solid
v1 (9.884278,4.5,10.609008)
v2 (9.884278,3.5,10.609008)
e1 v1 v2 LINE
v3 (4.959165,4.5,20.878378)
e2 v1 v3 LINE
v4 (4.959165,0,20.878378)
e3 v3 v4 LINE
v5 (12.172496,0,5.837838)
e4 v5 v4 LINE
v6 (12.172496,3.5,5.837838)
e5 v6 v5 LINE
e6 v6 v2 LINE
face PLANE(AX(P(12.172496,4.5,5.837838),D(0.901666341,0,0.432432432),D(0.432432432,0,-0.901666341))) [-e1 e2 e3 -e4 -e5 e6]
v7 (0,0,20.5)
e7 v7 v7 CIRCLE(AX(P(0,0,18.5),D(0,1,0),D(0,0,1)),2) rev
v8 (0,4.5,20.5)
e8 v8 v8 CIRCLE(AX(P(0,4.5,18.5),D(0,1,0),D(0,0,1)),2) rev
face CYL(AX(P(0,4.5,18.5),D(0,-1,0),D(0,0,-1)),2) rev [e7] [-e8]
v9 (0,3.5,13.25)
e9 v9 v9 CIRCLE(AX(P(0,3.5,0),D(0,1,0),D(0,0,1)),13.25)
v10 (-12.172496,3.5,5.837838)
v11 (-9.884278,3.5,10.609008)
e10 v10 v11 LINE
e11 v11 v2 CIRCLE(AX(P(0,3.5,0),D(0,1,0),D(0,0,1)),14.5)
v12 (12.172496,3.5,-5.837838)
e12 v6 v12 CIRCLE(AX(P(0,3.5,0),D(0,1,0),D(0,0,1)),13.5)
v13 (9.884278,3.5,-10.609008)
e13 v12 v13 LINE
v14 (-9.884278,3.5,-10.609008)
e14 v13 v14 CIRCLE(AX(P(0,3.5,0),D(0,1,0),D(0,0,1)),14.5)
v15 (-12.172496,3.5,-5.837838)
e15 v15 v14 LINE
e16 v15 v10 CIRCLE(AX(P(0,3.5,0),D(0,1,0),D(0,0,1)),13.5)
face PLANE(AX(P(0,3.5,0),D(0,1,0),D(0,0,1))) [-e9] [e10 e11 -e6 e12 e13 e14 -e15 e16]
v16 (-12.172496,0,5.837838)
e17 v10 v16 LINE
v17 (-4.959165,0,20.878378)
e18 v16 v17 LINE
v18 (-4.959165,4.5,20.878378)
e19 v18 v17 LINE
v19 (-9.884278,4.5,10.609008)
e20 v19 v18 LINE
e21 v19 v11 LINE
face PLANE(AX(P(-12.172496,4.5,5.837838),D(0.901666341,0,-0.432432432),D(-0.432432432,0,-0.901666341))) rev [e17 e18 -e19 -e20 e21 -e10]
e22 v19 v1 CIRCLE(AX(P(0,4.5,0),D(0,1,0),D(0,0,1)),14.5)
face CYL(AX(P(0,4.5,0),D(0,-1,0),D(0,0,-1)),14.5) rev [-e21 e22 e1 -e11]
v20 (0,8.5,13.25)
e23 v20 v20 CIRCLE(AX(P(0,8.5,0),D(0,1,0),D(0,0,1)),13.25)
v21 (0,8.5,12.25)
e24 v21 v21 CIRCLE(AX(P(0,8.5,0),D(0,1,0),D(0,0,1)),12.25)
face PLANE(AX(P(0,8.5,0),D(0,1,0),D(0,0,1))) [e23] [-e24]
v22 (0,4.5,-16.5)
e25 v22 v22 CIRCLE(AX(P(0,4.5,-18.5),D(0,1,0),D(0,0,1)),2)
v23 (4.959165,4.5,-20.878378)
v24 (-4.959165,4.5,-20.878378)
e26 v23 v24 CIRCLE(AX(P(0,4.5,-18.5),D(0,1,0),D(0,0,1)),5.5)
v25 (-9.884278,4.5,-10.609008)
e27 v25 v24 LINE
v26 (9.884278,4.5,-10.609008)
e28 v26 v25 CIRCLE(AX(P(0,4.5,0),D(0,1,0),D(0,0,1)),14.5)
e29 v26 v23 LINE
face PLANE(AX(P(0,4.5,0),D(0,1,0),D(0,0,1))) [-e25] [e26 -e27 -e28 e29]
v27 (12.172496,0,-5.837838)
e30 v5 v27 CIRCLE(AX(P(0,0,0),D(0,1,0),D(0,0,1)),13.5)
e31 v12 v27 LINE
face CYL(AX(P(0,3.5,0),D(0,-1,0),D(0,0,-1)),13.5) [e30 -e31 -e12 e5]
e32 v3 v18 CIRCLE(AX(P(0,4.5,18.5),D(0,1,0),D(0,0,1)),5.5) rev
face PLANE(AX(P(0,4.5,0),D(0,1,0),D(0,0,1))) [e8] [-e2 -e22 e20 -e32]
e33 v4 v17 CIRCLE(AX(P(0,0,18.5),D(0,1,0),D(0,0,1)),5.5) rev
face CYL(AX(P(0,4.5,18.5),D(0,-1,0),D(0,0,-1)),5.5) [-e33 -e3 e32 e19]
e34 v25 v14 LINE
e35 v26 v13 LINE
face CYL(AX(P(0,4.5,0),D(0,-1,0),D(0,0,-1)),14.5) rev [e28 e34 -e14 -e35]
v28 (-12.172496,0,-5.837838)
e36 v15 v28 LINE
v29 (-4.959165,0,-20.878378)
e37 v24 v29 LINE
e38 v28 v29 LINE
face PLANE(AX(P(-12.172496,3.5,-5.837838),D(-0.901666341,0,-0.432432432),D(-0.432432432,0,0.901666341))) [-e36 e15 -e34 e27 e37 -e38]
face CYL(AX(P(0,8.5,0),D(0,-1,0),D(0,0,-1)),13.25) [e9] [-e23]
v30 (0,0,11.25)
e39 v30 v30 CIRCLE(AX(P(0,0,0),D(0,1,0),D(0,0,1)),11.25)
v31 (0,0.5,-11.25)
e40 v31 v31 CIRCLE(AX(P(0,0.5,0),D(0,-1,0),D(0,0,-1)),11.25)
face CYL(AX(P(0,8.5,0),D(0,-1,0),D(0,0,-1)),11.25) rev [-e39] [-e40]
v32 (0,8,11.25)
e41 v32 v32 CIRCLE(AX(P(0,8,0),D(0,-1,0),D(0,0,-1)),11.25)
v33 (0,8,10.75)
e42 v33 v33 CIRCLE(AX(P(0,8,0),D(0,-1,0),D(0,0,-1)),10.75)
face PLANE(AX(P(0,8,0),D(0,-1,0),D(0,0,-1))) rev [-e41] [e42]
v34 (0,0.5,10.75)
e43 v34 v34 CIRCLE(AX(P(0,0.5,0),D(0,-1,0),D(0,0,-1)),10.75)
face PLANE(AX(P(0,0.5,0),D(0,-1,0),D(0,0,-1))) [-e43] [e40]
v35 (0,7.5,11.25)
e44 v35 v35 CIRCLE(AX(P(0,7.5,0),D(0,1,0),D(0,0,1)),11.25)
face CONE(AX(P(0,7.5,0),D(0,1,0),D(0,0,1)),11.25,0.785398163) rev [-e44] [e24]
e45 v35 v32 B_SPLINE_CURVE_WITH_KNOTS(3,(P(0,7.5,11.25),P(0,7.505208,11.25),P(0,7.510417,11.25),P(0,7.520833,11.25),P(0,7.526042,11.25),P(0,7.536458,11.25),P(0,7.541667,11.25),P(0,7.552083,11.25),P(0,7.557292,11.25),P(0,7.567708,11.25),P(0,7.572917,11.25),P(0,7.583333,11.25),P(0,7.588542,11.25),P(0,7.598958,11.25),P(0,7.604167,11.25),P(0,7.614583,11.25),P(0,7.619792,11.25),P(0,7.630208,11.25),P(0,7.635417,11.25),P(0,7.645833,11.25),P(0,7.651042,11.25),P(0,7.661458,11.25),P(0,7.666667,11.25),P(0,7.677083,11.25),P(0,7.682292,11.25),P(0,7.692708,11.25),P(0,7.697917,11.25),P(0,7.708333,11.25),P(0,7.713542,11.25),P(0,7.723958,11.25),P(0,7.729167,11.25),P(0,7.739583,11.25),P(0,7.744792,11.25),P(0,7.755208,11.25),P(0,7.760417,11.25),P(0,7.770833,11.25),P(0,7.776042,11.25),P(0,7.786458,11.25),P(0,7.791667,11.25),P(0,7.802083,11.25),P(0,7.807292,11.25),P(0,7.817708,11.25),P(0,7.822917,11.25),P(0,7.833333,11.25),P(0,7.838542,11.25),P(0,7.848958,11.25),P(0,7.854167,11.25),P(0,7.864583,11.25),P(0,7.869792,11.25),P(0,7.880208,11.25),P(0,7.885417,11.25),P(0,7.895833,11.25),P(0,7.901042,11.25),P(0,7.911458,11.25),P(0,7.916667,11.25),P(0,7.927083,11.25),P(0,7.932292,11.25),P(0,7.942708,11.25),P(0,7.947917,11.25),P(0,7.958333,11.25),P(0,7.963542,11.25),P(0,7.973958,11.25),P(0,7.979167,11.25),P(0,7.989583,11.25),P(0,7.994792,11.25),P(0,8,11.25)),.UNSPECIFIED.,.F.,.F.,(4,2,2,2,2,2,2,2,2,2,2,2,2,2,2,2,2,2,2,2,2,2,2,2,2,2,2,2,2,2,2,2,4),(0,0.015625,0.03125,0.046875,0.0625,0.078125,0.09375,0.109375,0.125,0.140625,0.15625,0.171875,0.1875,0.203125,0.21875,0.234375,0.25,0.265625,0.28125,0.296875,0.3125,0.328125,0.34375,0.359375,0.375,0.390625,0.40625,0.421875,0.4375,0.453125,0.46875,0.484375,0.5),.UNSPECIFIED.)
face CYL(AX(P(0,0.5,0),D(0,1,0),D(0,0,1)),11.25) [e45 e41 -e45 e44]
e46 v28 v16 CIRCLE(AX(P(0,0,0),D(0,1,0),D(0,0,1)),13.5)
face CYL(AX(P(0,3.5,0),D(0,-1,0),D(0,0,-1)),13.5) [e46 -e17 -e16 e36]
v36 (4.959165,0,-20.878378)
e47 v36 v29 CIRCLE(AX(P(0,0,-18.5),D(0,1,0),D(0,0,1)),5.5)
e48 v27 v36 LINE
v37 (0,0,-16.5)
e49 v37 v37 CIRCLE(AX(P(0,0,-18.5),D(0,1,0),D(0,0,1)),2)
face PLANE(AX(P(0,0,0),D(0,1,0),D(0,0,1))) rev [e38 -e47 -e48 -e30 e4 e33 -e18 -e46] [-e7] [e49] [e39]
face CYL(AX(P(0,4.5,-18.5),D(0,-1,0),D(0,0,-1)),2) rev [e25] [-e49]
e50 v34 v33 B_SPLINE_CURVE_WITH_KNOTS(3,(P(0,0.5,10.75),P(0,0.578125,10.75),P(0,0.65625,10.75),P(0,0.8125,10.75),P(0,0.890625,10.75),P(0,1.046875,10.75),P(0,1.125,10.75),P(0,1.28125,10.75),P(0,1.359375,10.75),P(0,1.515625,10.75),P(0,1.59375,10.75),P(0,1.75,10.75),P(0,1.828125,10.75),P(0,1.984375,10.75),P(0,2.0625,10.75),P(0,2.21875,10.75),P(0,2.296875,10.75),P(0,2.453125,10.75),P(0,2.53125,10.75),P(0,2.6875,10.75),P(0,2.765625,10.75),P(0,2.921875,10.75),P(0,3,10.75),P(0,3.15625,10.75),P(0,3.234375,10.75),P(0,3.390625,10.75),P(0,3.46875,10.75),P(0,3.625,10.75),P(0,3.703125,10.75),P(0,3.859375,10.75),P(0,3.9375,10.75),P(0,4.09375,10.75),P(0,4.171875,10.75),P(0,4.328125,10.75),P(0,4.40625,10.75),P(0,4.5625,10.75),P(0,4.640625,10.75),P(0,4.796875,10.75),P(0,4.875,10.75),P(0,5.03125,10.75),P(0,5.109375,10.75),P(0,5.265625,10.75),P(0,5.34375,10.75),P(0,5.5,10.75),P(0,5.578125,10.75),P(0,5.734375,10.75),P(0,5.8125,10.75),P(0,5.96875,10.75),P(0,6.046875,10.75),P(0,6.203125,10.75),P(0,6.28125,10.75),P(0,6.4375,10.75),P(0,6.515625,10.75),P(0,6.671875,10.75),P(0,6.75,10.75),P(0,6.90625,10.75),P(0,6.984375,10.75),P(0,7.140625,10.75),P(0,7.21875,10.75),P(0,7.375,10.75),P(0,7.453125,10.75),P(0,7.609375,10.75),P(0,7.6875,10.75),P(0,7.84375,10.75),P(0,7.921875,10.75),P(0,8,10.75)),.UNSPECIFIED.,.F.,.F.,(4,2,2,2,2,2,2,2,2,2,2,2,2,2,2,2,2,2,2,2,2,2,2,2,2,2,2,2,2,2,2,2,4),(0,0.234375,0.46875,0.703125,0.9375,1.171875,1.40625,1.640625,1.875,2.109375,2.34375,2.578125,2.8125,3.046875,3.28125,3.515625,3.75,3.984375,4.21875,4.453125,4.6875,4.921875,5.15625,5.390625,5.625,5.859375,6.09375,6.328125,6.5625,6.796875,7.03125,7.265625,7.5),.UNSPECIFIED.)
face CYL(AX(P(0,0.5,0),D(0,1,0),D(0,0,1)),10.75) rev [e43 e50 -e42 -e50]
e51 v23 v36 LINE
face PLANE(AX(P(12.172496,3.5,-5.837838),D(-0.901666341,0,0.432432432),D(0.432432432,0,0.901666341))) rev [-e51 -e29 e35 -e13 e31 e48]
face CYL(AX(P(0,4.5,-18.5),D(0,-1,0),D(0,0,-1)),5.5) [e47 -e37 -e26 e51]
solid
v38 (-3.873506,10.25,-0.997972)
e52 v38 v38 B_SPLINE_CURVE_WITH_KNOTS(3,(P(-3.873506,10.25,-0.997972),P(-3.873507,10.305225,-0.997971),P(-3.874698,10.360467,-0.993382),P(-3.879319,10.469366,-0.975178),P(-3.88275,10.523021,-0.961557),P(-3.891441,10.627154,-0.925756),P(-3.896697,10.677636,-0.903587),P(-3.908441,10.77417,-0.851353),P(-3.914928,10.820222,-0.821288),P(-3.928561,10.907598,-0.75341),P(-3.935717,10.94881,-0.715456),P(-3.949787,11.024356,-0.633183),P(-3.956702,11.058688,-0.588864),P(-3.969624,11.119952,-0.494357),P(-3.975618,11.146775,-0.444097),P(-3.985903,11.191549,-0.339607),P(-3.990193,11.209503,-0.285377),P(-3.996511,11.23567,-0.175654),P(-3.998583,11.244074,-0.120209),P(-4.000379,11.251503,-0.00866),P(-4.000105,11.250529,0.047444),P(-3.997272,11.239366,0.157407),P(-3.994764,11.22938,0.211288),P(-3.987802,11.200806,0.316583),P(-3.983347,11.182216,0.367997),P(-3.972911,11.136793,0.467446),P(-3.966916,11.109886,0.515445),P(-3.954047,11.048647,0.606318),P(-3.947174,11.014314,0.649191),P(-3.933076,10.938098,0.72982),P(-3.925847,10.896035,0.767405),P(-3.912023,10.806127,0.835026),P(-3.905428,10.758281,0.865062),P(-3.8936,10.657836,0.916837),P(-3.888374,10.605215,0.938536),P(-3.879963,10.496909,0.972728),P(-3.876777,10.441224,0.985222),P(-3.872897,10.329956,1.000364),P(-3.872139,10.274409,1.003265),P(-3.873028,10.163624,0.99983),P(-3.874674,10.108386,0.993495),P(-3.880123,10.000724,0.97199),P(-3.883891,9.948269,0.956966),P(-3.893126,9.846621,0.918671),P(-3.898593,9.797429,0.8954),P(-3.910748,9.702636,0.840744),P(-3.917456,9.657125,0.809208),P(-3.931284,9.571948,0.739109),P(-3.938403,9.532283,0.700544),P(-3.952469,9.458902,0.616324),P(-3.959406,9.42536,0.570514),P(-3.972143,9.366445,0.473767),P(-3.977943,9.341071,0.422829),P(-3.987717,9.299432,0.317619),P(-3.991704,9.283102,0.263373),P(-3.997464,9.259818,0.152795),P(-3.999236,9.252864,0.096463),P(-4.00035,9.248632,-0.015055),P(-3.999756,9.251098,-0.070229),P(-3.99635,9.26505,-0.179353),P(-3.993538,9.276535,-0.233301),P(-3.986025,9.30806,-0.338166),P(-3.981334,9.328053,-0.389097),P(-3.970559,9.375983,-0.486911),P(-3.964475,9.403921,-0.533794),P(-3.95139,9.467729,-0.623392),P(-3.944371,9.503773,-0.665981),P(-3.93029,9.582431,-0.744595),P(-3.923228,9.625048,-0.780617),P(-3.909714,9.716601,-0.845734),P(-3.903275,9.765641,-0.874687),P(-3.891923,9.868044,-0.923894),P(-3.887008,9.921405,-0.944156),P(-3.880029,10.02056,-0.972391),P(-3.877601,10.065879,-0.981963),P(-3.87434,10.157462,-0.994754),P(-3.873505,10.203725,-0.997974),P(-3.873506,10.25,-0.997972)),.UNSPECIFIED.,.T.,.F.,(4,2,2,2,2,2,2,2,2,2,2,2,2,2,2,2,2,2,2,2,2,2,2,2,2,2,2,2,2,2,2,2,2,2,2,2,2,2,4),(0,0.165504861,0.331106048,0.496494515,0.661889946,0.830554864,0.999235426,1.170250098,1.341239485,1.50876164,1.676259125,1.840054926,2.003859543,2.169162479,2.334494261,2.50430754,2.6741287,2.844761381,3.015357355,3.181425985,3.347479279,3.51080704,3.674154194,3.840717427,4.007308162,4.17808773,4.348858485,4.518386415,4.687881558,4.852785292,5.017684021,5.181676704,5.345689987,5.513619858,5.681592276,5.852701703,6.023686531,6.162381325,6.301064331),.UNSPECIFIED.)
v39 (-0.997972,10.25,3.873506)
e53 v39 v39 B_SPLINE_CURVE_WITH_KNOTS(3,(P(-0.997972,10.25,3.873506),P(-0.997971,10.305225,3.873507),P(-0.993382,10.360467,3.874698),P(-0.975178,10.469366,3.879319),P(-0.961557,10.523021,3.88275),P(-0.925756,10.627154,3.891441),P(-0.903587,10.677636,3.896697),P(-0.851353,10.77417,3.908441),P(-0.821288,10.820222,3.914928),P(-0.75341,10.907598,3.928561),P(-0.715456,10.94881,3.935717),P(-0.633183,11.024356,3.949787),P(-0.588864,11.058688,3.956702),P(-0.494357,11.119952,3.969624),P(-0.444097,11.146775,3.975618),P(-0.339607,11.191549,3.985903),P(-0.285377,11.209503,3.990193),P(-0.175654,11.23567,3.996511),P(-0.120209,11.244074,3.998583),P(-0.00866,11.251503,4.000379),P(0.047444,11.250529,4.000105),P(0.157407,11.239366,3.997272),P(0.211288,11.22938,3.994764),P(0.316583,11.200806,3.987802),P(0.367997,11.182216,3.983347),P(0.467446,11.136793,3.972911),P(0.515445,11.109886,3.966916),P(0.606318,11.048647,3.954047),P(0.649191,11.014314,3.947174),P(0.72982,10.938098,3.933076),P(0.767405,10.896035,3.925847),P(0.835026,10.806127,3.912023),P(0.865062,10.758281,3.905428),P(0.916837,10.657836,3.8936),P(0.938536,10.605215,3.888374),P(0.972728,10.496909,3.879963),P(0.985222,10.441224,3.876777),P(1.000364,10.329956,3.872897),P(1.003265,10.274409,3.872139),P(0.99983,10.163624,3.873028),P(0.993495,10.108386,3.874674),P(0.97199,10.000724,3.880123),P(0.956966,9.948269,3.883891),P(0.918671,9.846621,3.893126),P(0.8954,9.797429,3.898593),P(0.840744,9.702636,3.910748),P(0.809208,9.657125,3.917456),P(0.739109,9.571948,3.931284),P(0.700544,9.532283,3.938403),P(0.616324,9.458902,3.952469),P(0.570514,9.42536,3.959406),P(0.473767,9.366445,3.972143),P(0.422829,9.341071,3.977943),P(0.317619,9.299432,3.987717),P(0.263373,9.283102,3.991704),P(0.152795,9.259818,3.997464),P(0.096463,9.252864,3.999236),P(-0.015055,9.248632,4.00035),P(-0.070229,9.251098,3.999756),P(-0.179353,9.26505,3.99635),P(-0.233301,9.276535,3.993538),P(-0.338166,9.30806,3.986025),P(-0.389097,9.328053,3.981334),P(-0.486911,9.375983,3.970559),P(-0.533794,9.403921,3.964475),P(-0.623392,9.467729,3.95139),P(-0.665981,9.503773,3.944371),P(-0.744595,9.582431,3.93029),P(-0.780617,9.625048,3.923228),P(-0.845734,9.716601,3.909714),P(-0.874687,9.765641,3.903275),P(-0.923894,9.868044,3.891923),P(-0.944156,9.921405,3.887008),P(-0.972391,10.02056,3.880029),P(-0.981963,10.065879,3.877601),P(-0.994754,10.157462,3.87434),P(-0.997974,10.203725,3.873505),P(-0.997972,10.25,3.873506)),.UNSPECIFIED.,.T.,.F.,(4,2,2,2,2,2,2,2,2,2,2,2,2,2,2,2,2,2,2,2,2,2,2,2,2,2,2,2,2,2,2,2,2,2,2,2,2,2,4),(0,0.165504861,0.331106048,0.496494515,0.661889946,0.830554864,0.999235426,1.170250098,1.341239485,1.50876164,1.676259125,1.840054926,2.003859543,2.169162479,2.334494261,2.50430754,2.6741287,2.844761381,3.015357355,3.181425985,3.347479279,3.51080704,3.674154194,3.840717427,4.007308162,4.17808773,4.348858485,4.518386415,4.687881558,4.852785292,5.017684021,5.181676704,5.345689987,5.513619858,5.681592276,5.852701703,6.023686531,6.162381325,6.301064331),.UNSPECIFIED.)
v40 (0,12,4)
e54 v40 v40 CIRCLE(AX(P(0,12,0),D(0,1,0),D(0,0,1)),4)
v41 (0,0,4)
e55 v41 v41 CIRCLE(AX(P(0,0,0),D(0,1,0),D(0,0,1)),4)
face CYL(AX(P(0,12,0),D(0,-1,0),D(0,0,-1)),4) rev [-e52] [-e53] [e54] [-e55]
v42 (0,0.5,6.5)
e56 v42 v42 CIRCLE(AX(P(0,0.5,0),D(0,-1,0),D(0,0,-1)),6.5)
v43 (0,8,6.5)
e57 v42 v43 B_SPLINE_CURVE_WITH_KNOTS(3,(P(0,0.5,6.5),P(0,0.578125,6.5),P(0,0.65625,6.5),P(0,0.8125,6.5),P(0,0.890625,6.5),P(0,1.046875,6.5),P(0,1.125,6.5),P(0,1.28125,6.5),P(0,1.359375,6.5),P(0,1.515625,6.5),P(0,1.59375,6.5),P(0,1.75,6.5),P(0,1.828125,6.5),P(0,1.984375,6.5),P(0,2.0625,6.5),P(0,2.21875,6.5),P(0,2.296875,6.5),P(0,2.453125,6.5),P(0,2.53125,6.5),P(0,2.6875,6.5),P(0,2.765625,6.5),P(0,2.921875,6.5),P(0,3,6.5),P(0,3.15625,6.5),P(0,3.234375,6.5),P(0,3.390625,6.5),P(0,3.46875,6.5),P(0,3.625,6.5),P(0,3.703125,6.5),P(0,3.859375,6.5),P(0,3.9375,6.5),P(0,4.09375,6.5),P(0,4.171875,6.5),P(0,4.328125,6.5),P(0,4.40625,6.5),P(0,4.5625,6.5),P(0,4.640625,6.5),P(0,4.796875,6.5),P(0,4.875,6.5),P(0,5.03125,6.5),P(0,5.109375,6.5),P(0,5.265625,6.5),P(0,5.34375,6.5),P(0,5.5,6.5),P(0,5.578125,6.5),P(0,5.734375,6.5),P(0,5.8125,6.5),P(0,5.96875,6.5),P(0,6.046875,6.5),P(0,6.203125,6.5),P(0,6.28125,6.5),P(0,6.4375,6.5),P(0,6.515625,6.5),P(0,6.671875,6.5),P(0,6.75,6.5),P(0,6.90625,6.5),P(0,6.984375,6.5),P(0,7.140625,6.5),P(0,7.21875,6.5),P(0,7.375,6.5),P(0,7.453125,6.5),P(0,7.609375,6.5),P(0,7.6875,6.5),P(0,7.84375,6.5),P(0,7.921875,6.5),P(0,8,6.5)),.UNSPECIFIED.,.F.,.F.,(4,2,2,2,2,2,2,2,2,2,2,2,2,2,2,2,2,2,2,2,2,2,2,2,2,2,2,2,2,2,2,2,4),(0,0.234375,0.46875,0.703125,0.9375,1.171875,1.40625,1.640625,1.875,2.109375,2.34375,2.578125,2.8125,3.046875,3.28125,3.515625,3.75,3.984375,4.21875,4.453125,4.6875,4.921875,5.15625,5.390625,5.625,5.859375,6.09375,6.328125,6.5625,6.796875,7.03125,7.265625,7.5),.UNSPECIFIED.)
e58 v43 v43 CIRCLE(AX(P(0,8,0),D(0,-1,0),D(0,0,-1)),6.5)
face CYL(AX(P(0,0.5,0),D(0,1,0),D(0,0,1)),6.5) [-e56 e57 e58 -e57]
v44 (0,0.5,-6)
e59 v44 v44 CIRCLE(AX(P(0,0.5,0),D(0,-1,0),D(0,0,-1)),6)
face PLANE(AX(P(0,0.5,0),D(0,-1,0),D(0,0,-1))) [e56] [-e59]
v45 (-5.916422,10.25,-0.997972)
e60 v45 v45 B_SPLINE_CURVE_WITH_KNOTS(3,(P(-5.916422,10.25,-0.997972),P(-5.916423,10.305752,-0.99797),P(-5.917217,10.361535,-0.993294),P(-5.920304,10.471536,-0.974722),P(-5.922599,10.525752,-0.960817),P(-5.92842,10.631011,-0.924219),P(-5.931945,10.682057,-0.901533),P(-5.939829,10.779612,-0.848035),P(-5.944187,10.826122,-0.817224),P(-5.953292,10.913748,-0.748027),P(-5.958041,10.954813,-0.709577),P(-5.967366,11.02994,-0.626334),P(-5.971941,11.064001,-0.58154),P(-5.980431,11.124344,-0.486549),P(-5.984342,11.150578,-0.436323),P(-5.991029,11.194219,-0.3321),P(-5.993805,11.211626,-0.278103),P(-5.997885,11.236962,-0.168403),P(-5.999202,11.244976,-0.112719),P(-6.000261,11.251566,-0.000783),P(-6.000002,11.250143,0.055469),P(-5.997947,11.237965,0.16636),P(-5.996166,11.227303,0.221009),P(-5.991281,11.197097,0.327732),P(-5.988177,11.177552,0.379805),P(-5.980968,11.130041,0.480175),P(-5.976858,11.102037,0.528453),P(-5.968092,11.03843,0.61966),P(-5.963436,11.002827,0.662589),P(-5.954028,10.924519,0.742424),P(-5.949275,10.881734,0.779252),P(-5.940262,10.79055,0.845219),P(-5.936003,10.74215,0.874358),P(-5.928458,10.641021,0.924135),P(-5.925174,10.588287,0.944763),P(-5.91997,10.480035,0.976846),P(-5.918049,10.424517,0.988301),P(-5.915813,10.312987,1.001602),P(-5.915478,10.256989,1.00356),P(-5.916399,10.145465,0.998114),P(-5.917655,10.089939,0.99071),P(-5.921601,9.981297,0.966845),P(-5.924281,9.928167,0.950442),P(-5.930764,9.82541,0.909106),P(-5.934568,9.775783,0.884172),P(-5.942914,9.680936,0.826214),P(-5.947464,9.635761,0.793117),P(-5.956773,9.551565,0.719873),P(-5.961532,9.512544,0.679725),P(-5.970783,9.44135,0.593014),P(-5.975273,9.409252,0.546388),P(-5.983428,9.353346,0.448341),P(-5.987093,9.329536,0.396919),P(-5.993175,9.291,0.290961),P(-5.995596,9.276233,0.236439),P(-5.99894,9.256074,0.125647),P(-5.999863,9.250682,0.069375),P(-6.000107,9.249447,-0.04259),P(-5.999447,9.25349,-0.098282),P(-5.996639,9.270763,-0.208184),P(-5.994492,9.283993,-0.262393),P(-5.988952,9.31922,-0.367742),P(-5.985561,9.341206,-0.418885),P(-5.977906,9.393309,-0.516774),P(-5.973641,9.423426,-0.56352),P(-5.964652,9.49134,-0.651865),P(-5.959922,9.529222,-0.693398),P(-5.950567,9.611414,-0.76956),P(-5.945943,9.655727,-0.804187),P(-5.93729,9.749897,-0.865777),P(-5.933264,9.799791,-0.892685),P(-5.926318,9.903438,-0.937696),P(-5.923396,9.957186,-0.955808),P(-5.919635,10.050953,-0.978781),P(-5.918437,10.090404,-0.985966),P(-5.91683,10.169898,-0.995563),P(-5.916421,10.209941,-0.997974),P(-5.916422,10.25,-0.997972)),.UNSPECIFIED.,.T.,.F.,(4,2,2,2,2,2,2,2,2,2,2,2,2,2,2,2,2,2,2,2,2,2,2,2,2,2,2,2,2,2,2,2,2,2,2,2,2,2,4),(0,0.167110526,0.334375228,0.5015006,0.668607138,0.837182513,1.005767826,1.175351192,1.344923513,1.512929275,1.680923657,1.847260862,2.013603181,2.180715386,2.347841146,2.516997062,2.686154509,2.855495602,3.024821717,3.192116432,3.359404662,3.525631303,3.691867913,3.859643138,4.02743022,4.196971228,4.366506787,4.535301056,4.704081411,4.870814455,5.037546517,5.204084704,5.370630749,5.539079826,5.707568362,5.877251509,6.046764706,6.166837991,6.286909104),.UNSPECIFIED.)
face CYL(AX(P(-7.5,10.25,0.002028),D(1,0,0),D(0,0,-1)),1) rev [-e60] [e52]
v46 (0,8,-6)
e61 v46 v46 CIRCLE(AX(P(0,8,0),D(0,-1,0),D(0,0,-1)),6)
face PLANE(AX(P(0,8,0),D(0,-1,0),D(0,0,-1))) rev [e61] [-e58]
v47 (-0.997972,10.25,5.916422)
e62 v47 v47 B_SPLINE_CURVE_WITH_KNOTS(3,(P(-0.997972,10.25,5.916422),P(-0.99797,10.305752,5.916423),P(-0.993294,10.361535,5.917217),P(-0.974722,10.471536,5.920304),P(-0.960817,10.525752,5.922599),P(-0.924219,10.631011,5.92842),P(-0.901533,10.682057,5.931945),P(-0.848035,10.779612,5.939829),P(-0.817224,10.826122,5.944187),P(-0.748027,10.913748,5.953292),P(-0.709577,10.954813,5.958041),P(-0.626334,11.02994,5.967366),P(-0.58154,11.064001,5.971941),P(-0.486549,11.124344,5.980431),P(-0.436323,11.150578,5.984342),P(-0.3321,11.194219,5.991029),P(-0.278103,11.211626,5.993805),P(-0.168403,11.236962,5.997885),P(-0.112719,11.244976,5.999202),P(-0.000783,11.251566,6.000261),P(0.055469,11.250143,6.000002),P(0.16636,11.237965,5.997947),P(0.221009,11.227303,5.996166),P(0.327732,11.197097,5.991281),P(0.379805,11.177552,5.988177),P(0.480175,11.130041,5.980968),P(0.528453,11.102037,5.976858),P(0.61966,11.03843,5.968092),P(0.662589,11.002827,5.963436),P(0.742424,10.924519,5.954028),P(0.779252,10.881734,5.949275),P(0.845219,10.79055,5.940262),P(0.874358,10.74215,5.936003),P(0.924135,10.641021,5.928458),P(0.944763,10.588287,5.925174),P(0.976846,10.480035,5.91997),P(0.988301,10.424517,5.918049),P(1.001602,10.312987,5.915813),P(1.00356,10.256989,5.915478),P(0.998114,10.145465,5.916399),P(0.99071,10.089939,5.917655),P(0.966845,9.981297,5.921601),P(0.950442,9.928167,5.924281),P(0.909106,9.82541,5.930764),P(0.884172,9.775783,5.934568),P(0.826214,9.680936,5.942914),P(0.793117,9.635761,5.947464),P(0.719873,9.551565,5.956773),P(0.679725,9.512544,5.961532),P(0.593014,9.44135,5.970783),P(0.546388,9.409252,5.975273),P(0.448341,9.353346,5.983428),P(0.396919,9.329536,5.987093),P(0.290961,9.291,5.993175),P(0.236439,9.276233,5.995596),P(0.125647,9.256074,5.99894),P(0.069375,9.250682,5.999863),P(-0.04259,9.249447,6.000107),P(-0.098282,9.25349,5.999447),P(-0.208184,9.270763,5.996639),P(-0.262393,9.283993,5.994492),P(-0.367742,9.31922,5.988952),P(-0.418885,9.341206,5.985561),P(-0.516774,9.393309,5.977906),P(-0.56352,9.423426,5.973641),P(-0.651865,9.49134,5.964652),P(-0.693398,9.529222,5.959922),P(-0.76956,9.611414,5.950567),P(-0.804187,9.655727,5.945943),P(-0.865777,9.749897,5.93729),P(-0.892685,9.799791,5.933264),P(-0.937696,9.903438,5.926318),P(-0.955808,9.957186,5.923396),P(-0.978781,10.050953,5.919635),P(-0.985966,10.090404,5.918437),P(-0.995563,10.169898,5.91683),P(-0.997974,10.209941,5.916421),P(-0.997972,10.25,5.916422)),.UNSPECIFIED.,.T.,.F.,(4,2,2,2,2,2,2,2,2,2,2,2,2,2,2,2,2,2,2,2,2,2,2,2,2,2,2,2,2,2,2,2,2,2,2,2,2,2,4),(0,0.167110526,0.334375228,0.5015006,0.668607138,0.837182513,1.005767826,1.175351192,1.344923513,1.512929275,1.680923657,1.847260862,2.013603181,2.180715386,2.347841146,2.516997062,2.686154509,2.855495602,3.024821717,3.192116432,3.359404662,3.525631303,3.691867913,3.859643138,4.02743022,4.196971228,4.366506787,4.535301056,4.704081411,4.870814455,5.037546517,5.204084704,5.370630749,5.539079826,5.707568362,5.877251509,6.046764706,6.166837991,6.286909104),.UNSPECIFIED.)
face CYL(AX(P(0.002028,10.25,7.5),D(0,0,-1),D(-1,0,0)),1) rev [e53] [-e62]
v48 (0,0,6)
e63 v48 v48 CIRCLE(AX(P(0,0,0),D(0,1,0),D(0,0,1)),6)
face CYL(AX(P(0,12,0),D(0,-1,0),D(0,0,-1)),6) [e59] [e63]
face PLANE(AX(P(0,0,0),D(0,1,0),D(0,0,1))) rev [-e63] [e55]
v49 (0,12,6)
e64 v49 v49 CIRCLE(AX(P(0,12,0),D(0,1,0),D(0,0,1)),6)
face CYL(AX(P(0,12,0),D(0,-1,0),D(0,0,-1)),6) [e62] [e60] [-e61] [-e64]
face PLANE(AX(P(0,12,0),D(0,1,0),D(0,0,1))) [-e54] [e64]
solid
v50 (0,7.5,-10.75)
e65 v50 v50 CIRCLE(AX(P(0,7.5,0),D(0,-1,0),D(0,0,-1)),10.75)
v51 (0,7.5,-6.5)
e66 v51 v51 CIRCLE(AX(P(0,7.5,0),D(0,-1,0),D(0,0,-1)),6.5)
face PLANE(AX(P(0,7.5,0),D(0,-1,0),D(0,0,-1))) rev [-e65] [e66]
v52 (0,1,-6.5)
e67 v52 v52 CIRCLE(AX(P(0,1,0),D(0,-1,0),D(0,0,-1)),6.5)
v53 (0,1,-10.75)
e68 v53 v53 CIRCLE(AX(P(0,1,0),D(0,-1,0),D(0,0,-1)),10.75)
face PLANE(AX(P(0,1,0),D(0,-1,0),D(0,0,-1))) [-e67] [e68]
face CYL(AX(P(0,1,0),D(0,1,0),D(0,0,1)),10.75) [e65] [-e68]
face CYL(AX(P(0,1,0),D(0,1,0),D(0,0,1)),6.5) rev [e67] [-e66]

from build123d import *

# Parameters (mm, degrees)
SKETCH1_R             = 2
BOSS_EXTRUDE1_DEPTH   = 4.5
BOSS_EXTRUDE1_2_DEPTH = 4.5
SKETCH1_3_R           = 13.5
SKETCH1_3_R_2         = 13.25
BOSS_EXTRUDE2_DEPTH   = 3.5
SKETCH1_5_R           = 13.25
SKETCH1_5_R_2         = 12.25
BOSS_EXTRUDE3_DEPTH   = 8.5
SKETCH1_6_R           = 6
SKETCH1_6_R_2         = 4
BOSS_EXTRUDE4_DEPTH   = 12
SKETCH1_7_R           = 12.25
SKETCH1_7_R_2         = 11.25
BOSS_EXTRUDE5_DEPTH   = 8.5
CHAMFER1_SIZE         = 1
SKETCH2_R             = 11.25
SKETCH2_R_2           = 10.75
SKETCH2_R_3           = 6.5
SKETCH2_R_4           = 6
BOSS_EXTRUDE6_DEPTH   = 3.75
SKETCH2_3_R           = 10.75
SKETCH2_3_R_2         = 6.5
BOSS_EXTRUDE7_DEPTH   = 3.25
SKETCH3_R             = 1
CUT_EXTRUDE2_DEPTH    = 7.5
CIRPATTERN1_COUNT     = 2
CIRPATTERN1_ANGLE     = 90


with BuildPart() as part:
    # Sketch1 → Boss-Extrude1 (new body)
    with BuildSketch(Plane(origin=(0, 0, 0), x_dir=(1, 0, 0), z_dir=(0, 1, 0))):
        with BuildLine():
            Line((4.959164878, -20.878378378), (9.88427826, -10.609007648))
            ThreePointArc((9.88427826, -10.609007648), (0, -14.5), (-9.88427826, -10.609007648))
            Line((-9.88427826, -10.609007648), (-4.959164878, -20.878378378))
            ThreePointArc((-4.959164878, -20.878378378), (0, -24), (4.959164878, -20.878378378))
        make_face()
        with Locations(Location((0, -18.5, 0), (0, 0, 270))):
            Circle(SKETCH1_R, mode=Mode.SUBTRACT)
    extrude(amount=BOSS_EXTRUDE1_DEPTH)



with BuildPart() as body_2:
    # Sketch1 → Boss-Extrude1 2 (new body)
    with BuildSketch(Plane(origin=(0, 0, 0), x_dir=(1, 0, 0), z_dir=(0, 1, 0))):
        with BuildLine():
            ThreePointArc((-9.88427826, 10.609007648), (0, 14.5), (9.88427826, 10.609007648))
            Line((9.88427826, 10.609007648), (4.959164878, 20.878378378))
            ThreePointArc((4.959164878, 20.878378378), (0, 24), (-4.959164878, 20.878378378))
            Line((-4.959164878, 20.878378378), (-9.88427826, 10.609007648))
        make_face()
        with Locations(Location((0, 18.5, 0), (0, 0, 270))):
            Circle(SKETCH1_R, mode=Mode.SUBTRACT)
    extrude(amount=BOSS_EXTRUDE1_2_DEPTH)


with BuildPart() as part_1:
    add(part.part)

    add(body_2.part)  # Boss-Extrude2 merges body 2
    # Sketch1<3> → Boss-Extrude2 (add)
    # profile 1 of 3: a face of its own
    with BuildSketch(Plane(origin=(0, 0, 0), x_dir=(1, 0, 0), z_dir=(0, 1, 0))):
        with BuildLine():
            Line((9.88427826, -10.609007648), (12.17249561, -5.837837838))
            ThreePointArc((12.17249561, -5.837837838), (0, -13.5), (-12.17249561, -5.837837838))
            Line((-12.17249561, -5.837837838), (-9.88427826, -10.609007648))
            ThreePointArc((-9.88427826, -10.609007648), (0, -14.5), (9.88427826, -10.609007648))
        make_face()
    # profile 2 of 3: a face of its own
    with BuildSketch(Plane(origin=(0, 0, 0), x_dir=(1, 0, 0), z_dir=(0, 1, 0))):
        with BuildLine():
            ThreePointArc((-12.17249561, 5.837837838), (0, 13.5), (12.17249561, 5.837837838))
            Line((12.17249561, 5.837837838), (9.88427826, 10.609007648))
            ThreePointArc((9.88427826, 10.609007648), (0, 14.5), (-9.88427826, 10.609007648))
            Line((-9.88427826, 10.609007648), (-12.17249561, 5.837837838))
        make_face()
    # profile 3 of 3: a face of its own
    with BuildSketch(Plane(origin=(0, 0, 0), x_dir=(1, 0, 0), z_dir=(0, 1, 0))):
        Circle(SKETCH1_3_R)
        with Locations(Location((0, 0, 0), (0, 0, 270))):
            Circle(SKETCH1_3_R_2, mode=Mode.SUBTRACT)
    extrude(amount=BOSS_EXTRUDE2_DEPTH)

    # Sketch1<5> → Boss-Extrude3 (add)
    with BuildSketch(Plane(origin=(0, 0, 0), x_dir=(1, 0, 0), z_dir=(0, 1, 0))):
        with Locations(Location((0, 0, 0), (0, 0, 270))):
            Circle(SKETCH1_5_R)
        with Locations(Location((0, 0, 0), (0, 0, 270))):
            Circle(SKETCH1_5_R_2, mode=Mode.SUBTRACT)
    extrude(amount=BOSS_EXTRUDE3_DEPTH)



with BuildPart() as body_2_2:
    # Sketch1<6> → Boss-Extrude4 (new body)
    with BuildSketch(Plane(origin=(0, 0, 0), x_dir=(1, 0, 0), z_dir=(0, 1, 0))):
        with Locations(Location((0, 0, 0), (0, 0, 270))):
            Circle(SKETCH1_6_R)
        with Locations(Location((0, 0, 0), (0, 0, 270))):
            Circle(SKETCH1_6_R_2, mode=Mode.SUBTRACT)
    extrude(amount=BOSS_EXTRUDE4_DEPTH)


with BuildPart() as body_3:
    # Sketch1<7> → Boss-Extrude5 (new body)
    with BuildSketch(Plane(origin=(0, 0, 0), x_dir=(1, 0, 0), z_dir=(0, 1, 0))):
        with Locations(Location((0, 0, 0), (0, 0, 270))):
            Circle(SKETCH1_7_R)
        with Locations(Location((0, 0, 0), (0, 0, 270))):
            Circle(SKETCH1_7_R_2, mode=Mode.SUBTRACT)
    extrude(amount=BOSS_EXTRUDE5_DEPTH)

    # Chamfer1
    chamfer1_edges = [body_3.edges().sort_by_distance(p)[0] for p in [
        (0, 8.5, -11.25),
    ]]
    chamfer(chamfer1_edges, length=CHAMFER1_SIZE - 0.0001)  # a hair under: the kernel refuses the full size


with BuildPart() as part_2:
    add(part_1.part)

    add(body_3.part)  # Boss-Extrude6 merges body 3

    add(body_2_2.part)  # Boss-Extrude6 merges body 2 2
    # Sketch2 → Boss-Extrude6 (add, symmetric)
    # profile 1 of 2: a face of its own
    with BuildSketch(Plane(origin=(0, 4.25, 0), x_dir=(-1, 0, 0), z_dir=(0, -1, 0))):
        with Locations(Location((0, 0, 0), (0, 0, 90))):
            Circle(SKETCH2_R)
        with Locations(Location((0, 0, 0), (0, 0, 270))):
            Circle(SKETCH2_R_2, mode=Mode.SUBTRACT)
    # profile 2 of 2: a face of its own
    with BuildSketch(Plane(origin=(0, 4.25, 0), x_dir=(-1, 0, 0), z_dir=(0, -1, 0))):
        with Locations(Location((0, 0, 0), (0, 0, 270))):
            Circle(SKETCH2_R_3)
        with Locations(Location((0, 0, 0), (0, 0, 90))):
            Circle(SKETCH2_R_4, mode=Mode.SUBTRACT)
    extrude(amount=BOSS_EXTRUDE6_DEPTH, both=True)

    # Sketch3 → Cut-Extrude2 (cut)
    with BuildSketch(Plane(origin=(0, 0, 0), x_dir=(0, 0, -1), z_dir=(1, 0, 0))):
        with Locations((-0.002027508, 10.25)):
            Circle(SKETCH3_R)
    cut_extrude2 = extrude(amount=-CUT_EXTRUDE2_DEPTH, mode=Mode.SUBTRACT)

    # CirPattern1: Cut-Extrude2 ×2 about axis
    cirpattern1_axis = Axis((0, 12, 0), (0, 1, 0))
    for i in range(1, CIRPATTERN1_COUNT):
        add(cut_extrude2.rotate(cirpattern1_axis, i * CIRPATTERN1_ANGLE / (CIRPATTERN1_COUNT - 1)), mode=Mode.SUBTRACT)


with BuildPart() as body_2_3:
    # Sketch2<3> → Boss-Extrude7 (new, symmetric)
    with BuildSketch(Plane(origin=(0, 4.25, 0), x_dir=(-1, 0, 0), z_dir=(0, -1, 0))):
        with Locations(Location((0, 0, 0), (0, 0, 90))):
            Circle(SKETCH2_3_R)
        with Locations(Location((0, 0, 0), (0, 0, 90))):
            Circle(SKETCH2_3_R_2, mode=Mode.SUBTRACT)
    extrude(amount=BOSS_EXTRUDE7_DEPTH, both=True)


solid = Compound([part_2.part, body_2_3.part])
